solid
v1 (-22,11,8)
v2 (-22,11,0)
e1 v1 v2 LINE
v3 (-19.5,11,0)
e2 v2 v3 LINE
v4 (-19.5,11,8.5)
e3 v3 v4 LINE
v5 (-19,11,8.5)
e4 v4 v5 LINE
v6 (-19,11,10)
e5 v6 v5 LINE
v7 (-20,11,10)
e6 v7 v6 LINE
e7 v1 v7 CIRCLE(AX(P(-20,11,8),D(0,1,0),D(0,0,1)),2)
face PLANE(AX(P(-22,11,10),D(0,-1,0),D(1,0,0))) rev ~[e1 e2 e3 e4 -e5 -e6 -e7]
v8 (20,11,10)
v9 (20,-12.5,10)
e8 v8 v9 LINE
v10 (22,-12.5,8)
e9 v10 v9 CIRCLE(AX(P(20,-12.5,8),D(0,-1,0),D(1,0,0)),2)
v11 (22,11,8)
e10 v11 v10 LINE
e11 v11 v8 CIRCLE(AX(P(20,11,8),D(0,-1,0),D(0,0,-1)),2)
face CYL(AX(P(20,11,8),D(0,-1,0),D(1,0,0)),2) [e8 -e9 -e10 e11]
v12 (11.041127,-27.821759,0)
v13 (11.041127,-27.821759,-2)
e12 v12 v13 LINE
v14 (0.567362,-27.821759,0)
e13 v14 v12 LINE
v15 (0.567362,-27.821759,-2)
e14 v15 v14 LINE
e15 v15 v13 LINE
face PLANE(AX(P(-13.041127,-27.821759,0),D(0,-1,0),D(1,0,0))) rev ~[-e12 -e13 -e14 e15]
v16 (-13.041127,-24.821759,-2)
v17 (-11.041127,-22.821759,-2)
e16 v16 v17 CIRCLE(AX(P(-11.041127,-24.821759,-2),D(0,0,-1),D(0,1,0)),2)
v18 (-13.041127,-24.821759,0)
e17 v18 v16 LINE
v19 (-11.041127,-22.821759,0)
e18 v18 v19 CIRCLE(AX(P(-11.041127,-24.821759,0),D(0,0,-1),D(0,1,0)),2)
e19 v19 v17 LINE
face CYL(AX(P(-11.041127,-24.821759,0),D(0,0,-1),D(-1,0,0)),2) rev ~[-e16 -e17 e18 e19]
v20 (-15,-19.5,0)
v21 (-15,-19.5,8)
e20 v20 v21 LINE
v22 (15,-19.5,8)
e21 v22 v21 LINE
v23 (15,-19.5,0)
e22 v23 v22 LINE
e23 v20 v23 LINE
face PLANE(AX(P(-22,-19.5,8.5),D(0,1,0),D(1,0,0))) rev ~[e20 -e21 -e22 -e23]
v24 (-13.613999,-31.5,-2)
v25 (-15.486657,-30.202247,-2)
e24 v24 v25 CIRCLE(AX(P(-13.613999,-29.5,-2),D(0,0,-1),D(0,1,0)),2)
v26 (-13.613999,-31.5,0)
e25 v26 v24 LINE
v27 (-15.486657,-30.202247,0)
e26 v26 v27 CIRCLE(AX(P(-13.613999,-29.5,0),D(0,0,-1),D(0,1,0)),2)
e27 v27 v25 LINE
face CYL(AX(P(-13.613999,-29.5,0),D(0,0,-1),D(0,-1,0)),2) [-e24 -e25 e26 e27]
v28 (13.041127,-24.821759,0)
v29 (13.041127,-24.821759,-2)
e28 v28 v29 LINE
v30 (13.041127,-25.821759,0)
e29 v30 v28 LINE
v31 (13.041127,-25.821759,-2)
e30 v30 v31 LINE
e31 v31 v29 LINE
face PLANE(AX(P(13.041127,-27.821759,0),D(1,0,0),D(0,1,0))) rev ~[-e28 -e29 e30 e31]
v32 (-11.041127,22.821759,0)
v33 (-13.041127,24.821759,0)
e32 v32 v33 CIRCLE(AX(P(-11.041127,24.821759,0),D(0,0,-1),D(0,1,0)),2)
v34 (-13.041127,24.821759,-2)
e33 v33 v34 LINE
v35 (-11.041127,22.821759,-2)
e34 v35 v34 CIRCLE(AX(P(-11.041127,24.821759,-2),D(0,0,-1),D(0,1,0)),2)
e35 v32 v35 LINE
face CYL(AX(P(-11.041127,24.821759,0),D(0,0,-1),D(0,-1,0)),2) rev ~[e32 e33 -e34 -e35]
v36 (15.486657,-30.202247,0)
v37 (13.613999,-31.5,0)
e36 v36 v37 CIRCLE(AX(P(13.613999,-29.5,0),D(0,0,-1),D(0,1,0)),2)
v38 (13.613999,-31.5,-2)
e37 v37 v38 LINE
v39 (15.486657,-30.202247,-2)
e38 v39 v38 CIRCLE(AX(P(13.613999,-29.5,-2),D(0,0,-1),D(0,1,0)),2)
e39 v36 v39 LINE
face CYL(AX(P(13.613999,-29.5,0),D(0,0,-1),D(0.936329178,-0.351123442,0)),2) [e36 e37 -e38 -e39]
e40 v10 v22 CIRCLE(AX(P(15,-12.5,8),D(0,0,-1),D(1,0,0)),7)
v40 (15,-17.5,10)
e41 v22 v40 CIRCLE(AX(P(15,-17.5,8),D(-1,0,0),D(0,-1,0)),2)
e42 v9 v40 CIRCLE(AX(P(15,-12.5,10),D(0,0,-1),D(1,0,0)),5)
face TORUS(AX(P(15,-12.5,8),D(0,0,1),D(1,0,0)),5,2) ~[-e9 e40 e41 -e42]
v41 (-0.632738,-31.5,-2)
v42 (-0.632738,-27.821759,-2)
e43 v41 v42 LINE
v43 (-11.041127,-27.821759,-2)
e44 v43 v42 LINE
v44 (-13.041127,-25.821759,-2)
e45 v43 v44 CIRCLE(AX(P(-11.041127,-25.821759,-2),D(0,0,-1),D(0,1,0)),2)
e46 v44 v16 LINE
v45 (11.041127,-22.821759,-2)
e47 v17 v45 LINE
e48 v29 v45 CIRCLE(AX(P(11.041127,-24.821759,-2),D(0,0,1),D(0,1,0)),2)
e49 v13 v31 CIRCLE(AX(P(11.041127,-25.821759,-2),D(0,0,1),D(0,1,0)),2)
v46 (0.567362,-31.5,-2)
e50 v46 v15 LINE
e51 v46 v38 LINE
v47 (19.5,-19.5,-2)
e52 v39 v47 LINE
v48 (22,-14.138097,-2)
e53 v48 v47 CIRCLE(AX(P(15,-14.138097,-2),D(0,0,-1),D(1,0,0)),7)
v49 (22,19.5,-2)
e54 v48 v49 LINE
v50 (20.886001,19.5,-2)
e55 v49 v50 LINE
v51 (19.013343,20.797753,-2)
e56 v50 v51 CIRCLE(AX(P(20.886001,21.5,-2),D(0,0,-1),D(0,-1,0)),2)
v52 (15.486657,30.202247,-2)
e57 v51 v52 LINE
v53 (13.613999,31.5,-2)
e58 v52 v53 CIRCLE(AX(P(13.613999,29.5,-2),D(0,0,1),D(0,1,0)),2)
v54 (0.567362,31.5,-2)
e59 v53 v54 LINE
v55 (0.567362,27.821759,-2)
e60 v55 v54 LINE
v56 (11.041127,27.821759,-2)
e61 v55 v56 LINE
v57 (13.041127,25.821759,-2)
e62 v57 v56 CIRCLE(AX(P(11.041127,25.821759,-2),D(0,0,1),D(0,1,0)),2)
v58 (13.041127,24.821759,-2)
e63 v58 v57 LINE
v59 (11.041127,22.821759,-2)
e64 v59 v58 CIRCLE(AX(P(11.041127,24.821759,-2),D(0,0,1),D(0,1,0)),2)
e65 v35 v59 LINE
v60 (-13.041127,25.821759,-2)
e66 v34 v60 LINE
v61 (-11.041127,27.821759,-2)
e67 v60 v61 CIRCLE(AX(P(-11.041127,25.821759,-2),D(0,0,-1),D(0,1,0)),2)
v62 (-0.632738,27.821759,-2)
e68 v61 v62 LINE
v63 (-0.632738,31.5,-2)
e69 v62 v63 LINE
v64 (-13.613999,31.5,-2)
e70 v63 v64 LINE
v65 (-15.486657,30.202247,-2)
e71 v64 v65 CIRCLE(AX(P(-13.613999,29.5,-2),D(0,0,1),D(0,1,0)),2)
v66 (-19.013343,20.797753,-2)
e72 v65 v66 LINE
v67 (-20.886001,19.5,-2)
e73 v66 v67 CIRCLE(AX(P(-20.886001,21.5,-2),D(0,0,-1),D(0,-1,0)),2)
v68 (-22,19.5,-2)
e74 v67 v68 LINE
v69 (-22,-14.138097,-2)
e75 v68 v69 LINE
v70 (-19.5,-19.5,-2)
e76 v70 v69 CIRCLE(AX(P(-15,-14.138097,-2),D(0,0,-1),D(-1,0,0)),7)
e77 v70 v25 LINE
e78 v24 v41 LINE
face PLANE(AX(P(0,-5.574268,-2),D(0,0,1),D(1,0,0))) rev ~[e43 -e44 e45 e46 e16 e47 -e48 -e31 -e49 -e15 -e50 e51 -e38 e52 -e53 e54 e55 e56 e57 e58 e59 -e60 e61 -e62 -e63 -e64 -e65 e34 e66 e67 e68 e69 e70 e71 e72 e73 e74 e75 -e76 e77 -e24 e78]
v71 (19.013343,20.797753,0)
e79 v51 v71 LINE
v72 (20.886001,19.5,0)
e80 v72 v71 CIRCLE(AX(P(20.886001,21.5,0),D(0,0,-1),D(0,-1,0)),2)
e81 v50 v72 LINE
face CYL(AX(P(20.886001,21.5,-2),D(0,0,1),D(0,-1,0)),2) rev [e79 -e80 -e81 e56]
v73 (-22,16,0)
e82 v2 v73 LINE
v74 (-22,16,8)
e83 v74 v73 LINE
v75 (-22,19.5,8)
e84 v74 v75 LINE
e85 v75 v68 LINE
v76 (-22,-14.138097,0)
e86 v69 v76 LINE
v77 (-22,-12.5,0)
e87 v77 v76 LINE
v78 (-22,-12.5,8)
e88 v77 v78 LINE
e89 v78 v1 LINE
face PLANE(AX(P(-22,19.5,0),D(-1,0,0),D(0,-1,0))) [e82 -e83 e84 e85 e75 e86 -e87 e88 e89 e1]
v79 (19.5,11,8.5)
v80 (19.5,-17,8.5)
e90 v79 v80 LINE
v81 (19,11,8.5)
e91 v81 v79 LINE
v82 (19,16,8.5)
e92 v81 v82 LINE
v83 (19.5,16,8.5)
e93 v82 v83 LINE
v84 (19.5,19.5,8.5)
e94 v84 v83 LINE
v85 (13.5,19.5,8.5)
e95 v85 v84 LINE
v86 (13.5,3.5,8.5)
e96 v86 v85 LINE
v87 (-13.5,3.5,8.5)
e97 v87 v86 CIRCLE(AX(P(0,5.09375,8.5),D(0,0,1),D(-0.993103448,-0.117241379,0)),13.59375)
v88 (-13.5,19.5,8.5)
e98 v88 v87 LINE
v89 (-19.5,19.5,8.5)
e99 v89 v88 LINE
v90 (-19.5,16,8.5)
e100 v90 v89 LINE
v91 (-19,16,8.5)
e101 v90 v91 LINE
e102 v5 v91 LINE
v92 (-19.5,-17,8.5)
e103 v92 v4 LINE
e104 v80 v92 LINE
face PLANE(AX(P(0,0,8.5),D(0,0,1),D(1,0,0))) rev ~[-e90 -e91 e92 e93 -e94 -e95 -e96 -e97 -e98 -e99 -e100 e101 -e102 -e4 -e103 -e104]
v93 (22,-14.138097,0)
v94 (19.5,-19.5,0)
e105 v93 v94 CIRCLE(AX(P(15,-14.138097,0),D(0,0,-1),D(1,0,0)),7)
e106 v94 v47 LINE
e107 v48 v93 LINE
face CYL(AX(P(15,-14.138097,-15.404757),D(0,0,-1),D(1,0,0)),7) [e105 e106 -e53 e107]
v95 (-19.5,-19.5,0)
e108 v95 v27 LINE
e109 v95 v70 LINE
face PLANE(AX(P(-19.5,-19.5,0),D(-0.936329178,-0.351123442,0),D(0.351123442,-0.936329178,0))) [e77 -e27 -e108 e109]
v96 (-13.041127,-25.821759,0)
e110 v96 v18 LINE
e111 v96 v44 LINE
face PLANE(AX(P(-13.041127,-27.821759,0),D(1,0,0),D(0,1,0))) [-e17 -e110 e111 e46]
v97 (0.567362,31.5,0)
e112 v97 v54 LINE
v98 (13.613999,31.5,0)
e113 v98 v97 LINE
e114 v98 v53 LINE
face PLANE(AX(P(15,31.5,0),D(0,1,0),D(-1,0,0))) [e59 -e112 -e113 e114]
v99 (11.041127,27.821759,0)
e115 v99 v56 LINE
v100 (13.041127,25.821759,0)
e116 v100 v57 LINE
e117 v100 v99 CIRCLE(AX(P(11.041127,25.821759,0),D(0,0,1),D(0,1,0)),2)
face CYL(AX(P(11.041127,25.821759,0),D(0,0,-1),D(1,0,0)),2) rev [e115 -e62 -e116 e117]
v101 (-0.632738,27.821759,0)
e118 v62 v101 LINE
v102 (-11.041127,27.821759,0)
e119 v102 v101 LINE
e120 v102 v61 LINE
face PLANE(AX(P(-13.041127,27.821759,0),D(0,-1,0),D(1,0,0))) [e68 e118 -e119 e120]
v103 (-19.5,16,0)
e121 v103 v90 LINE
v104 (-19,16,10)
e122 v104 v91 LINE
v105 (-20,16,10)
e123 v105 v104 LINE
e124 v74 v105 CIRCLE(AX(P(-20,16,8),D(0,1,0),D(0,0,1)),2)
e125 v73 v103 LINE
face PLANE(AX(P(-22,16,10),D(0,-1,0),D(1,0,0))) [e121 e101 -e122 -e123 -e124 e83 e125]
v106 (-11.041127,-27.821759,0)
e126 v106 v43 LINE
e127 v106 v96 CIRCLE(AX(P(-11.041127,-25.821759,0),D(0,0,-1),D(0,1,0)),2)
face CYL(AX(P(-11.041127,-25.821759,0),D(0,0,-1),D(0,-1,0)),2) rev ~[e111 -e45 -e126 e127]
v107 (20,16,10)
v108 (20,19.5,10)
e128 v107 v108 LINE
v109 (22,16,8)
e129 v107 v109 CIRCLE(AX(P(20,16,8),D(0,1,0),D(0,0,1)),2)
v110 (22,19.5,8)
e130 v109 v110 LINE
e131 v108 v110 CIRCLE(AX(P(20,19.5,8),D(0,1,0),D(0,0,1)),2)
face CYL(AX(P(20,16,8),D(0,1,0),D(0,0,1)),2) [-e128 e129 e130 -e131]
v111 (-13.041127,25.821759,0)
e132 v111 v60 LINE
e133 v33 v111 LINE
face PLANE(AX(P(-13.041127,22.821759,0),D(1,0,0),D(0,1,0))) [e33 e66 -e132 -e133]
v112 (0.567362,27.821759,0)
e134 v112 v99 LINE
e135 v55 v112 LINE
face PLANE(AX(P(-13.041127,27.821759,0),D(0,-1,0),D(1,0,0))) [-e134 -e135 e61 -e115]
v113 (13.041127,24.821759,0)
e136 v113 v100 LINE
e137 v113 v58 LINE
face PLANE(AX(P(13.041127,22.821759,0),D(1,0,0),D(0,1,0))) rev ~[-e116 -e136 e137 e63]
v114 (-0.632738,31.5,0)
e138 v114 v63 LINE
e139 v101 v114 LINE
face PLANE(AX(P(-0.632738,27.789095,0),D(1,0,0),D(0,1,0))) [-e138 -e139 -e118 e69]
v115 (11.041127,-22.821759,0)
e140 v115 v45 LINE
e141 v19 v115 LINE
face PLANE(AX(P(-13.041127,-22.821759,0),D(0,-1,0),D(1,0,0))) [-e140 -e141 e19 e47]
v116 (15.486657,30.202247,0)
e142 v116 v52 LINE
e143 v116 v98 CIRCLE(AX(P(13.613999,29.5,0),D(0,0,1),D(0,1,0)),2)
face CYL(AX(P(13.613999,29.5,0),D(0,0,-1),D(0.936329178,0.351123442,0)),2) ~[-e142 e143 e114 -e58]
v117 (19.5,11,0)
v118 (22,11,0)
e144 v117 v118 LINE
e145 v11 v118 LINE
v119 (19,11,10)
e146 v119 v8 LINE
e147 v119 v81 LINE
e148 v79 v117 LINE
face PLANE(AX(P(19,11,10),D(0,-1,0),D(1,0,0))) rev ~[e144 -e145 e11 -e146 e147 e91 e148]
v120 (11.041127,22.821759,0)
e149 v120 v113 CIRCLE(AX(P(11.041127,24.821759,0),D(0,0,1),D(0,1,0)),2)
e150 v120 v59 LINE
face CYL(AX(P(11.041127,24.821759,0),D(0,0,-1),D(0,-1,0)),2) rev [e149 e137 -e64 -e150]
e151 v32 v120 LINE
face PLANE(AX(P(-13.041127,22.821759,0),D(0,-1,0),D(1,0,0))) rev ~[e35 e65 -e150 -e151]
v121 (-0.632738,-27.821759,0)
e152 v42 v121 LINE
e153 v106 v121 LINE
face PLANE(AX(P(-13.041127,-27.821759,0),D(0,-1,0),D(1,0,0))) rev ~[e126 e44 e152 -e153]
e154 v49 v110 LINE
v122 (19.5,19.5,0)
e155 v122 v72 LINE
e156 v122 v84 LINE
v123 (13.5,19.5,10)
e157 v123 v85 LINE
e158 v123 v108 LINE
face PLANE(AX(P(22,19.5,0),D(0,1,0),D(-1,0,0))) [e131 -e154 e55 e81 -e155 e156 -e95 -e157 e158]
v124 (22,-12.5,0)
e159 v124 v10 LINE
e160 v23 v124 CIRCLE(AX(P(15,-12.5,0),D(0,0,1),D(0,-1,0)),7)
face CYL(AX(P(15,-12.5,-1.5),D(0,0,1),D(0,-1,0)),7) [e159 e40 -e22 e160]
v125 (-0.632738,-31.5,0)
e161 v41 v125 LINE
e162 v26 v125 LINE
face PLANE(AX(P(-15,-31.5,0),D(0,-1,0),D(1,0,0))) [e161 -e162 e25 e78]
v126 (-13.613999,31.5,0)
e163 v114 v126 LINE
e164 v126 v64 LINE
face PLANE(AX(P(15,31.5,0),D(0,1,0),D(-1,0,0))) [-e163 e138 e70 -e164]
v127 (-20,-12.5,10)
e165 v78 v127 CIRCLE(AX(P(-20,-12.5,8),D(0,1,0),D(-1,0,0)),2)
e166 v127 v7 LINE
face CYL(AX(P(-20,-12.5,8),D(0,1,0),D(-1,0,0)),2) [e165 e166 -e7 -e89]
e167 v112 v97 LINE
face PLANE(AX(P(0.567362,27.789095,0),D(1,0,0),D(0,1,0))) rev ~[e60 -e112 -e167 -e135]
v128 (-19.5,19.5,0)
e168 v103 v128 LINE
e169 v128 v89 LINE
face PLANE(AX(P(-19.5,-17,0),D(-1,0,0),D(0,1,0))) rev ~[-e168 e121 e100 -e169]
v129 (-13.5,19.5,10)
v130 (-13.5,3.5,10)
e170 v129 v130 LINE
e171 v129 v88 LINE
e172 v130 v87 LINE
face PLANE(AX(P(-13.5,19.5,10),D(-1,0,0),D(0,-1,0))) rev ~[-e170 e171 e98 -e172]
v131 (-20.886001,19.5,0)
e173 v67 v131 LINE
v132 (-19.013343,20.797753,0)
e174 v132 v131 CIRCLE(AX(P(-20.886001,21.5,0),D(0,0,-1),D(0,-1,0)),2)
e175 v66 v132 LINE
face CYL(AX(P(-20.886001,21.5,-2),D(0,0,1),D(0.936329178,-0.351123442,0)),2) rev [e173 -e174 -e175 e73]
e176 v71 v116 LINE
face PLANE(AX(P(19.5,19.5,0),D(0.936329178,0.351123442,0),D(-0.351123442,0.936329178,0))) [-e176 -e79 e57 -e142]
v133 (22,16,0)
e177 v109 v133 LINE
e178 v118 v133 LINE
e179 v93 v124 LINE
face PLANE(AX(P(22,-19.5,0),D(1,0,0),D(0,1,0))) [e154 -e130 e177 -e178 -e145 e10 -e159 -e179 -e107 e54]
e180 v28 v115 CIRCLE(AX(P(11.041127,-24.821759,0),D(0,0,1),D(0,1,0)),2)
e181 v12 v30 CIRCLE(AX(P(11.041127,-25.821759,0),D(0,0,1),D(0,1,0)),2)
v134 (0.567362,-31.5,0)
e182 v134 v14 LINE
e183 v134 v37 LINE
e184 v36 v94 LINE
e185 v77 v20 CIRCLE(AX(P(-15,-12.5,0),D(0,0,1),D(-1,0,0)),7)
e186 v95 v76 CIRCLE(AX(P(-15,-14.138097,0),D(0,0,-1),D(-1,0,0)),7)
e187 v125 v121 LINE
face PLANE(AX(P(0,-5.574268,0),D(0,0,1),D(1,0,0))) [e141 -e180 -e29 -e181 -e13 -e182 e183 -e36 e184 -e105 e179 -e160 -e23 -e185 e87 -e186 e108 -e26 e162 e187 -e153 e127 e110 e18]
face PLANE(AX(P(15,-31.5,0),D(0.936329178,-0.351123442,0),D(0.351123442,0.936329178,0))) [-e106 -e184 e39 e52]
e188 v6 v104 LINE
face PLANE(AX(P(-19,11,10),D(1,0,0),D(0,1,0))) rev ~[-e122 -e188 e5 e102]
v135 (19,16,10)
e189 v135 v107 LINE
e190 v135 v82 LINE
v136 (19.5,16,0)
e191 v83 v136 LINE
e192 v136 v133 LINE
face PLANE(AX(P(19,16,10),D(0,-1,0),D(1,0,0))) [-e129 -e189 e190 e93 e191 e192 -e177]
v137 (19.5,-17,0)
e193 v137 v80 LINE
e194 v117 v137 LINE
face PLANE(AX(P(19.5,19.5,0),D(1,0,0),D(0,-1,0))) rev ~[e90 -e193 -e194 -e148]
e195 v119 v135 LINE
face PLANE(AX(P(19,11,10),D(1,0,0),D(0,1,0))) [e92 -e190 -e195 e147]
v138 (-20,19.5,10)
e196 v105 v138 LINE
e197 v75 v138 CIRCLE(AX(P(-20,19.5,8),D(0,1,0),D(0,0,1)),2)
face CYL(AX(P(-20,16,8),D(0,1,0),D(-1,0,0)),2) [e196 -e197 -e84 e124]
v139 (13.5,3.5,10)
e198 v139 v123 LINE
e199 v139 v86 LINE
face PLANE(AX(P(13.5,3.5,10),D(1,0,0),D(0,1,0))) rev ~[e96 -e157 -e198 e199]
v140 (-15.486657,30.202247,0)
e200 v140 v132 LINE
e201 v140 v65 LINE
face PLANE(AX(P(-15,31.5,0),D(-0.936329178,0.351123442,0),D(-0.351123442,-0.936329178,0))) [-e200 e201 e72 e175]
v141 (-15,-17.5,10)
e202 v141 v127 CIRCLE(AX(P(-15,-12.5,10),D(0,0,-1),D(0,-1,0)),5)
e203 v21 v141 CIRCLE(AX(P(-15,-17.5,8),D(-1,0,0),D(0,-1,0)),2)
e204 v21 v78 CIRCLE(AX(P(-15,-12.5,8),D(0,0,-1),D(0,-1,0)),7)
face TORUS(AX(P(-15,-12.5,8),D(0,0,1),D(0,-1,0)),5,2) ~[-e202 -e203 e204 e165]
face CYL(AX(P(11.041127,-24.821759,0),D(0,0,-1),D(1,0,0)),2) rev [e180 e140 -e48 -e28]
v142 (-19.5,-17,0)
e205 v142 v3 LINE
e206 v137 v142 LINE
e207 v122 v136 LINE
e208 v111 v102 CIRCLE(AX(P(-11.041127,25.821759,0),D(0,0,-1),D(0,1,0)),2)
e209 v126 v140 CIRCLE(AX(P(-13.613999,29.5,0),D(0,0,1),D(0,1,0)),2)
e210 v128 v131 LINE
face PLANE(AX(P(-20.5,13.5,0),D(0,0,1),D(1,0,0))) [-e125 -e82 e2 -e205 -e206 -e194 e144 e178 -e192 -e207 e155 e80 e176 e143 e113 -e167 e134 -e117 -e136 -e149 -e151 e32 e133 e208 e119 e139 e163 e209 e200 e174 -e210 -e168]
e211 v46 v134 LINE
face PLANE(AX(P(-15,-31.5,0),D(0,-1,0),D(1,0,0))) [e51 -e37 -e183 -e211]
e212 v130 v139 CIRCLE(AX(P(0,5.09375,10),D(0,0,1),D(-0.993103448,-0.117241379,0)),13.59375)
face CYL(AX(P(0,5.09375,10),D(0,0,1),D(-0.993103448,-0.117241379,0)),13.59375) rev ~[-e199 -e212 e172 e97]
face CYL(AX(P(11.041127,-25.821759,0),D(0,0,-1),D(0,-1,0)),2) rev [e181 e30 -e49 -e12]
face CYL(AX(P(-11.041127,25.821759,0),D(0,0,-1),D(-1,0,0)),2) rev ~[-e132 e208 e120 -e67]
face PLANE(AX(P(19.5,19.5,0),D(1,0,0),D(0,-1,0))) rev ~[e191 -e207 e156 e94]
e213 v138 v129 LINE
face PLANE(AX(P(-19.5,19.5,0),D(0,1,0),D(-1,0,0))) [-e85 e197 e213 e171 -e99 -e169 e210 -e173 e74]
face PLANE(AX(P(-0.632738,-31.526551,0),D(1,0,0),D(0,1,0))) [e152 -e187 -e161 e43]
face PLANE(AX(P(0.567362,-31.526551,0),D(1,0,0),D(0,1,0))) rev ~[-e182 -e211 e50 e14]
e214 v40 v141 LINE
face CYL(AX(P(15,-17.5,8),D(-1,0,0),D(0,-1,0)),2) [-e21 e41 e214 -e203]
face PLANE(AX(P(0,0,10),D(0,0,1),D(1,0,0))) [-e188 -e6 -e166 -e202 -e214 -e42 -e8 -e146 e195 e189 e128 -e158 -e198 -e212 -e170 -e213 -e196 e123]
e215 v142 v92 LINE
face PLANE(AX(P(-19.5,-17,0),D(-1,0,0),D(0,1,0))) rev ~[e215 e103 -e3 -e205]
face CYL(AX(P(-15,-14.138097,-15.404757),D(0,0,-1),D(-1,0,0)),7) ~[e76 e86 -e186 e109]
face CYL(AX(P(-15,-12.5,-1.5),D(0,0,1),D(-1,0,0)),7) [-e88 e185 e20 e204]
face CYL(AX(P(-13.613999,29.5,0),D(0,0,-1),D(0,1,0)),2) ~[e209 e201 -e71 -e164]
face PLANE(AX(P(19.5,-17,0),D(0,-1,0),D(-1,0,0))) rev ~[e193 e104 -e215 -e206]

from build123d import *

# Parameters (mm, degrees)
F1_DEPTH     = 8.5
F0_W         = 39
F0_H         = 36.5
F2_DEPTH     = 1.5
F3_W         = 44
F3_H         = 39
F4_DEPTH     = 1.5
F6_DEPTH     = 2
F7_W         = 3
F7_H         = 5
F8_DEPTH     = 10
F9_R         = 7
F10_R        = 2
F0_W_2       = 26.0822549462
F0_H_2       = 5
F11_DEPTH    = 2
F12_T1_DEPTH = 28.8095132369
F13_R        = 2
F14_R        = 2
F15_W        = 1.200100407
F15_H        = 3.7374552339
F16_DEPTH    = 5


# Not quite as in the source:
# - a fillet or chamfer that OpenCascade refuses, or shapes differently, is made with other operations: its cross-section is extruded or revolved along the edge and cut away or added


with BuildPart() as f1:
    # F0 (on Top) → F1 (new body)
    with BuildSketch(Plane.XY):
        Polygon((22, -19.5), (22, 19.5), (19.5, 19.5), (19.5, -17), (-19.5, -17), (-19.5, 19.5), (-22, 19.5), (-22, -19.5), (-19.5, -19.5), (19.5, -19.5), align=None)
    extrude(amount=F1_DEPTH)

    # F0 (on Top) → F2 (join)
    with BuildSketch(Plane.XY):
        with Locations((0, 1.25)):
            Rectangle(F0_W, F0_H)
        Polygon((22, -19.5), (22, 19.5), (19.5, 19.5), (19.5, -17), (-19.5, -17), (-19.5, 19.5), (-22, 19.5), (-22, -19.5), (-19.5, -19.5), (19.5, -19.5), align=None)
    extrude(amount=-F2_DEPTH)

    # F3 (on face) → F4 (join)
    with BuildSketch(Plane.XY.offset(8.5)):
        Rectangle(F3_W, F3_H)
    extrude(amount=F4_DEPTH)

    # F5 (on face) → F6 (cut)
    with BuildSketch(Plane.XY.offset(10)):
        with BuildLine():
            Line((13.5, 3.5), (13.5, 19.5))
            Line((13.5, 19.5), (-13.5, 19.5))
            Line((-13.5, 19.5), (-13.5, 3.5))
            ThreePointArc((-13.5, 3.5), (0, -8.5), (13.5, 3.5))
        make_face()
    extrude(amount=-F6_DEPTH, mode=Mode.SUBTRACT)

    # F7 (on face) → F8 (cut)
    with BuildSketch(Plane.XY.offset(10)):
        with Locations((20.5, 13.5)):
            Rectangle(F7_W, F7_H)
        with Locations((-20.5, 13.5)):
            Rectangle(F7_W, F7_H)
    extrude(amount=-F8_DEPTH, mode=Mode.SUBTRACT)

    # F9
    f9_edges = [f1.edges().sort_by_distance(p)[0] for p in [
        (22, -19.5, 4.25),
        (-22, -19.5, 4.25),
    ]]
    fillet(f9_edges, radius=F9_R)

    # F10
    f10_edges = [f1.edges().sort_by_distance(p)[0] for p in [
        (-22, -0.75, 10),
        (-22, 17.75, 10),
        (-19.949747, -17.449747, 10),
        (0, -19.5, 10),
        (19.949747, -17.449747, 10),
        (22, -0.75, 10),
        (22, 17.75, 10),
    ]]
    fillet(f10_edges, radius=F10_R)

    # F0 (on Top) → F11 (join)
    with BuildSketch(Plane.XY):
        Polygon((22, -19.5), (22, 19.5), (19.5, 19.5), (19.5, -17), (-19.5, -17), (-19.5, 19.5), (-22, 19.5), (-22, -19.5), (-19.5, -19.5), (19.5, -19.5), align=None)
        with Locations((0, 1.25)):
            Rectangle(F0_W, F0_H)
        Polygon((-19.5, 19.5), (19.5, 19.5), (15, 31.5), (-15, 31.5), align=None)
        with Locations((0, 25.3217592835)):
            Rectangle(F0_W_2, F0_H_2, mode=Mode.SUBTRACT)
        Polygon((15, -31.5), (19.5, -19.5), (-19.5, -19.5), (-15, -31.5), align=None)
        with Locations((0, -25.3217592835)):
            Rectangle(F0_W_2, F0_H_2, mode=Mode.SUBTRACT)
    extrude(amount=-F11_DEPTH)

    # F12: fillet of radius 7 on 2 edges, made by hand

    # F12_s2 → F12_t1 (cut)
    with BuildSketch(Plane.XY.offset(-15.4047566185)):
        with BuildLine():
            ThreePointArc((-22, -14.1380973526), (-21.3442887702, -17.0961372442), (-19.5, -19.5))
            Line((-19.5, -19.5), (-19.59, -19.6072380529))
            ThreePointArc((-19.59, -19.6072380529), (-20.75, -19.64), (-22, -19.64))
            Line((-22, -19.64), (-22.14, -19.5))
            Line((-22.14, -19.5), (-22.14, -14.1380973526))
            Line((-22.14, -14.1380973526), (-22, -14.1380973526))
        make_face()
        with BuildLine():
            ThreePointArc((22, -14.1380973526), (21.3442887702, -17.0961372442), (19.5, -19.5))
            Line((19.5, -19.5), (19.59, -19.6072380529))
            ThreePointArc((19.59, -19.6072380529), (20.75, -19.64), (22, -19.64))
            Line((22, -19.64), (22.14, -19.5))
            Line((22.14, -19.5), (22.14, -14.1380973526))
            Line((22.14, -14.1380973526), (22, -14.1380973526))
        make_face()
    extrude(amount=F12_T1_DEPTH, mode=Mode.SUBTRACT)

    # F13
    f13_edges = [f1.edges().sort_by_distance(p)[0] for p in [
        (15, 31.5, -1),
        (19.5, 19.5, -1),
        (-19.5, 19.5, -1),
        (-15, 31.5, -1),
        (15, -31.5, -1),
        (-15, -31.5, -1),
    ]]
    fillet(f13_edges, radius=F13_R)

    # F14
    f14_edges = [f1.edges().sort_by_distance(p)[0] for p in [
        (-13.041127, 22.821759, -1),
        (-13.041127, 27.821759, -1),
        (13.041127, 27.821759, -1),
        (13.041127, 22.821759, -1),
        (13.041127, -27.821759, -1),
        (13.041127, -22.821759, -1),
        (-13.041127, -22.821759, -1),
        (-13.041127, -27.821759, -1),
    ]]
    fillet(f14_edges, radius=F14_R)

    # F15 (on face) → F16 (cut)
    with BuildSketch(Plane.XY):
        with Locations((-0.0326880836, 29.6578230336)):
            Rectangle(F15_W, F15_H)
        with Locations((-0.0326880836, -29.6578230336)):
            Rectangle(F15_W, F15_H)
    extrude(amount=-F16_DEPTH, mode=Mode.SUBTRACT)


solid = f1.part
